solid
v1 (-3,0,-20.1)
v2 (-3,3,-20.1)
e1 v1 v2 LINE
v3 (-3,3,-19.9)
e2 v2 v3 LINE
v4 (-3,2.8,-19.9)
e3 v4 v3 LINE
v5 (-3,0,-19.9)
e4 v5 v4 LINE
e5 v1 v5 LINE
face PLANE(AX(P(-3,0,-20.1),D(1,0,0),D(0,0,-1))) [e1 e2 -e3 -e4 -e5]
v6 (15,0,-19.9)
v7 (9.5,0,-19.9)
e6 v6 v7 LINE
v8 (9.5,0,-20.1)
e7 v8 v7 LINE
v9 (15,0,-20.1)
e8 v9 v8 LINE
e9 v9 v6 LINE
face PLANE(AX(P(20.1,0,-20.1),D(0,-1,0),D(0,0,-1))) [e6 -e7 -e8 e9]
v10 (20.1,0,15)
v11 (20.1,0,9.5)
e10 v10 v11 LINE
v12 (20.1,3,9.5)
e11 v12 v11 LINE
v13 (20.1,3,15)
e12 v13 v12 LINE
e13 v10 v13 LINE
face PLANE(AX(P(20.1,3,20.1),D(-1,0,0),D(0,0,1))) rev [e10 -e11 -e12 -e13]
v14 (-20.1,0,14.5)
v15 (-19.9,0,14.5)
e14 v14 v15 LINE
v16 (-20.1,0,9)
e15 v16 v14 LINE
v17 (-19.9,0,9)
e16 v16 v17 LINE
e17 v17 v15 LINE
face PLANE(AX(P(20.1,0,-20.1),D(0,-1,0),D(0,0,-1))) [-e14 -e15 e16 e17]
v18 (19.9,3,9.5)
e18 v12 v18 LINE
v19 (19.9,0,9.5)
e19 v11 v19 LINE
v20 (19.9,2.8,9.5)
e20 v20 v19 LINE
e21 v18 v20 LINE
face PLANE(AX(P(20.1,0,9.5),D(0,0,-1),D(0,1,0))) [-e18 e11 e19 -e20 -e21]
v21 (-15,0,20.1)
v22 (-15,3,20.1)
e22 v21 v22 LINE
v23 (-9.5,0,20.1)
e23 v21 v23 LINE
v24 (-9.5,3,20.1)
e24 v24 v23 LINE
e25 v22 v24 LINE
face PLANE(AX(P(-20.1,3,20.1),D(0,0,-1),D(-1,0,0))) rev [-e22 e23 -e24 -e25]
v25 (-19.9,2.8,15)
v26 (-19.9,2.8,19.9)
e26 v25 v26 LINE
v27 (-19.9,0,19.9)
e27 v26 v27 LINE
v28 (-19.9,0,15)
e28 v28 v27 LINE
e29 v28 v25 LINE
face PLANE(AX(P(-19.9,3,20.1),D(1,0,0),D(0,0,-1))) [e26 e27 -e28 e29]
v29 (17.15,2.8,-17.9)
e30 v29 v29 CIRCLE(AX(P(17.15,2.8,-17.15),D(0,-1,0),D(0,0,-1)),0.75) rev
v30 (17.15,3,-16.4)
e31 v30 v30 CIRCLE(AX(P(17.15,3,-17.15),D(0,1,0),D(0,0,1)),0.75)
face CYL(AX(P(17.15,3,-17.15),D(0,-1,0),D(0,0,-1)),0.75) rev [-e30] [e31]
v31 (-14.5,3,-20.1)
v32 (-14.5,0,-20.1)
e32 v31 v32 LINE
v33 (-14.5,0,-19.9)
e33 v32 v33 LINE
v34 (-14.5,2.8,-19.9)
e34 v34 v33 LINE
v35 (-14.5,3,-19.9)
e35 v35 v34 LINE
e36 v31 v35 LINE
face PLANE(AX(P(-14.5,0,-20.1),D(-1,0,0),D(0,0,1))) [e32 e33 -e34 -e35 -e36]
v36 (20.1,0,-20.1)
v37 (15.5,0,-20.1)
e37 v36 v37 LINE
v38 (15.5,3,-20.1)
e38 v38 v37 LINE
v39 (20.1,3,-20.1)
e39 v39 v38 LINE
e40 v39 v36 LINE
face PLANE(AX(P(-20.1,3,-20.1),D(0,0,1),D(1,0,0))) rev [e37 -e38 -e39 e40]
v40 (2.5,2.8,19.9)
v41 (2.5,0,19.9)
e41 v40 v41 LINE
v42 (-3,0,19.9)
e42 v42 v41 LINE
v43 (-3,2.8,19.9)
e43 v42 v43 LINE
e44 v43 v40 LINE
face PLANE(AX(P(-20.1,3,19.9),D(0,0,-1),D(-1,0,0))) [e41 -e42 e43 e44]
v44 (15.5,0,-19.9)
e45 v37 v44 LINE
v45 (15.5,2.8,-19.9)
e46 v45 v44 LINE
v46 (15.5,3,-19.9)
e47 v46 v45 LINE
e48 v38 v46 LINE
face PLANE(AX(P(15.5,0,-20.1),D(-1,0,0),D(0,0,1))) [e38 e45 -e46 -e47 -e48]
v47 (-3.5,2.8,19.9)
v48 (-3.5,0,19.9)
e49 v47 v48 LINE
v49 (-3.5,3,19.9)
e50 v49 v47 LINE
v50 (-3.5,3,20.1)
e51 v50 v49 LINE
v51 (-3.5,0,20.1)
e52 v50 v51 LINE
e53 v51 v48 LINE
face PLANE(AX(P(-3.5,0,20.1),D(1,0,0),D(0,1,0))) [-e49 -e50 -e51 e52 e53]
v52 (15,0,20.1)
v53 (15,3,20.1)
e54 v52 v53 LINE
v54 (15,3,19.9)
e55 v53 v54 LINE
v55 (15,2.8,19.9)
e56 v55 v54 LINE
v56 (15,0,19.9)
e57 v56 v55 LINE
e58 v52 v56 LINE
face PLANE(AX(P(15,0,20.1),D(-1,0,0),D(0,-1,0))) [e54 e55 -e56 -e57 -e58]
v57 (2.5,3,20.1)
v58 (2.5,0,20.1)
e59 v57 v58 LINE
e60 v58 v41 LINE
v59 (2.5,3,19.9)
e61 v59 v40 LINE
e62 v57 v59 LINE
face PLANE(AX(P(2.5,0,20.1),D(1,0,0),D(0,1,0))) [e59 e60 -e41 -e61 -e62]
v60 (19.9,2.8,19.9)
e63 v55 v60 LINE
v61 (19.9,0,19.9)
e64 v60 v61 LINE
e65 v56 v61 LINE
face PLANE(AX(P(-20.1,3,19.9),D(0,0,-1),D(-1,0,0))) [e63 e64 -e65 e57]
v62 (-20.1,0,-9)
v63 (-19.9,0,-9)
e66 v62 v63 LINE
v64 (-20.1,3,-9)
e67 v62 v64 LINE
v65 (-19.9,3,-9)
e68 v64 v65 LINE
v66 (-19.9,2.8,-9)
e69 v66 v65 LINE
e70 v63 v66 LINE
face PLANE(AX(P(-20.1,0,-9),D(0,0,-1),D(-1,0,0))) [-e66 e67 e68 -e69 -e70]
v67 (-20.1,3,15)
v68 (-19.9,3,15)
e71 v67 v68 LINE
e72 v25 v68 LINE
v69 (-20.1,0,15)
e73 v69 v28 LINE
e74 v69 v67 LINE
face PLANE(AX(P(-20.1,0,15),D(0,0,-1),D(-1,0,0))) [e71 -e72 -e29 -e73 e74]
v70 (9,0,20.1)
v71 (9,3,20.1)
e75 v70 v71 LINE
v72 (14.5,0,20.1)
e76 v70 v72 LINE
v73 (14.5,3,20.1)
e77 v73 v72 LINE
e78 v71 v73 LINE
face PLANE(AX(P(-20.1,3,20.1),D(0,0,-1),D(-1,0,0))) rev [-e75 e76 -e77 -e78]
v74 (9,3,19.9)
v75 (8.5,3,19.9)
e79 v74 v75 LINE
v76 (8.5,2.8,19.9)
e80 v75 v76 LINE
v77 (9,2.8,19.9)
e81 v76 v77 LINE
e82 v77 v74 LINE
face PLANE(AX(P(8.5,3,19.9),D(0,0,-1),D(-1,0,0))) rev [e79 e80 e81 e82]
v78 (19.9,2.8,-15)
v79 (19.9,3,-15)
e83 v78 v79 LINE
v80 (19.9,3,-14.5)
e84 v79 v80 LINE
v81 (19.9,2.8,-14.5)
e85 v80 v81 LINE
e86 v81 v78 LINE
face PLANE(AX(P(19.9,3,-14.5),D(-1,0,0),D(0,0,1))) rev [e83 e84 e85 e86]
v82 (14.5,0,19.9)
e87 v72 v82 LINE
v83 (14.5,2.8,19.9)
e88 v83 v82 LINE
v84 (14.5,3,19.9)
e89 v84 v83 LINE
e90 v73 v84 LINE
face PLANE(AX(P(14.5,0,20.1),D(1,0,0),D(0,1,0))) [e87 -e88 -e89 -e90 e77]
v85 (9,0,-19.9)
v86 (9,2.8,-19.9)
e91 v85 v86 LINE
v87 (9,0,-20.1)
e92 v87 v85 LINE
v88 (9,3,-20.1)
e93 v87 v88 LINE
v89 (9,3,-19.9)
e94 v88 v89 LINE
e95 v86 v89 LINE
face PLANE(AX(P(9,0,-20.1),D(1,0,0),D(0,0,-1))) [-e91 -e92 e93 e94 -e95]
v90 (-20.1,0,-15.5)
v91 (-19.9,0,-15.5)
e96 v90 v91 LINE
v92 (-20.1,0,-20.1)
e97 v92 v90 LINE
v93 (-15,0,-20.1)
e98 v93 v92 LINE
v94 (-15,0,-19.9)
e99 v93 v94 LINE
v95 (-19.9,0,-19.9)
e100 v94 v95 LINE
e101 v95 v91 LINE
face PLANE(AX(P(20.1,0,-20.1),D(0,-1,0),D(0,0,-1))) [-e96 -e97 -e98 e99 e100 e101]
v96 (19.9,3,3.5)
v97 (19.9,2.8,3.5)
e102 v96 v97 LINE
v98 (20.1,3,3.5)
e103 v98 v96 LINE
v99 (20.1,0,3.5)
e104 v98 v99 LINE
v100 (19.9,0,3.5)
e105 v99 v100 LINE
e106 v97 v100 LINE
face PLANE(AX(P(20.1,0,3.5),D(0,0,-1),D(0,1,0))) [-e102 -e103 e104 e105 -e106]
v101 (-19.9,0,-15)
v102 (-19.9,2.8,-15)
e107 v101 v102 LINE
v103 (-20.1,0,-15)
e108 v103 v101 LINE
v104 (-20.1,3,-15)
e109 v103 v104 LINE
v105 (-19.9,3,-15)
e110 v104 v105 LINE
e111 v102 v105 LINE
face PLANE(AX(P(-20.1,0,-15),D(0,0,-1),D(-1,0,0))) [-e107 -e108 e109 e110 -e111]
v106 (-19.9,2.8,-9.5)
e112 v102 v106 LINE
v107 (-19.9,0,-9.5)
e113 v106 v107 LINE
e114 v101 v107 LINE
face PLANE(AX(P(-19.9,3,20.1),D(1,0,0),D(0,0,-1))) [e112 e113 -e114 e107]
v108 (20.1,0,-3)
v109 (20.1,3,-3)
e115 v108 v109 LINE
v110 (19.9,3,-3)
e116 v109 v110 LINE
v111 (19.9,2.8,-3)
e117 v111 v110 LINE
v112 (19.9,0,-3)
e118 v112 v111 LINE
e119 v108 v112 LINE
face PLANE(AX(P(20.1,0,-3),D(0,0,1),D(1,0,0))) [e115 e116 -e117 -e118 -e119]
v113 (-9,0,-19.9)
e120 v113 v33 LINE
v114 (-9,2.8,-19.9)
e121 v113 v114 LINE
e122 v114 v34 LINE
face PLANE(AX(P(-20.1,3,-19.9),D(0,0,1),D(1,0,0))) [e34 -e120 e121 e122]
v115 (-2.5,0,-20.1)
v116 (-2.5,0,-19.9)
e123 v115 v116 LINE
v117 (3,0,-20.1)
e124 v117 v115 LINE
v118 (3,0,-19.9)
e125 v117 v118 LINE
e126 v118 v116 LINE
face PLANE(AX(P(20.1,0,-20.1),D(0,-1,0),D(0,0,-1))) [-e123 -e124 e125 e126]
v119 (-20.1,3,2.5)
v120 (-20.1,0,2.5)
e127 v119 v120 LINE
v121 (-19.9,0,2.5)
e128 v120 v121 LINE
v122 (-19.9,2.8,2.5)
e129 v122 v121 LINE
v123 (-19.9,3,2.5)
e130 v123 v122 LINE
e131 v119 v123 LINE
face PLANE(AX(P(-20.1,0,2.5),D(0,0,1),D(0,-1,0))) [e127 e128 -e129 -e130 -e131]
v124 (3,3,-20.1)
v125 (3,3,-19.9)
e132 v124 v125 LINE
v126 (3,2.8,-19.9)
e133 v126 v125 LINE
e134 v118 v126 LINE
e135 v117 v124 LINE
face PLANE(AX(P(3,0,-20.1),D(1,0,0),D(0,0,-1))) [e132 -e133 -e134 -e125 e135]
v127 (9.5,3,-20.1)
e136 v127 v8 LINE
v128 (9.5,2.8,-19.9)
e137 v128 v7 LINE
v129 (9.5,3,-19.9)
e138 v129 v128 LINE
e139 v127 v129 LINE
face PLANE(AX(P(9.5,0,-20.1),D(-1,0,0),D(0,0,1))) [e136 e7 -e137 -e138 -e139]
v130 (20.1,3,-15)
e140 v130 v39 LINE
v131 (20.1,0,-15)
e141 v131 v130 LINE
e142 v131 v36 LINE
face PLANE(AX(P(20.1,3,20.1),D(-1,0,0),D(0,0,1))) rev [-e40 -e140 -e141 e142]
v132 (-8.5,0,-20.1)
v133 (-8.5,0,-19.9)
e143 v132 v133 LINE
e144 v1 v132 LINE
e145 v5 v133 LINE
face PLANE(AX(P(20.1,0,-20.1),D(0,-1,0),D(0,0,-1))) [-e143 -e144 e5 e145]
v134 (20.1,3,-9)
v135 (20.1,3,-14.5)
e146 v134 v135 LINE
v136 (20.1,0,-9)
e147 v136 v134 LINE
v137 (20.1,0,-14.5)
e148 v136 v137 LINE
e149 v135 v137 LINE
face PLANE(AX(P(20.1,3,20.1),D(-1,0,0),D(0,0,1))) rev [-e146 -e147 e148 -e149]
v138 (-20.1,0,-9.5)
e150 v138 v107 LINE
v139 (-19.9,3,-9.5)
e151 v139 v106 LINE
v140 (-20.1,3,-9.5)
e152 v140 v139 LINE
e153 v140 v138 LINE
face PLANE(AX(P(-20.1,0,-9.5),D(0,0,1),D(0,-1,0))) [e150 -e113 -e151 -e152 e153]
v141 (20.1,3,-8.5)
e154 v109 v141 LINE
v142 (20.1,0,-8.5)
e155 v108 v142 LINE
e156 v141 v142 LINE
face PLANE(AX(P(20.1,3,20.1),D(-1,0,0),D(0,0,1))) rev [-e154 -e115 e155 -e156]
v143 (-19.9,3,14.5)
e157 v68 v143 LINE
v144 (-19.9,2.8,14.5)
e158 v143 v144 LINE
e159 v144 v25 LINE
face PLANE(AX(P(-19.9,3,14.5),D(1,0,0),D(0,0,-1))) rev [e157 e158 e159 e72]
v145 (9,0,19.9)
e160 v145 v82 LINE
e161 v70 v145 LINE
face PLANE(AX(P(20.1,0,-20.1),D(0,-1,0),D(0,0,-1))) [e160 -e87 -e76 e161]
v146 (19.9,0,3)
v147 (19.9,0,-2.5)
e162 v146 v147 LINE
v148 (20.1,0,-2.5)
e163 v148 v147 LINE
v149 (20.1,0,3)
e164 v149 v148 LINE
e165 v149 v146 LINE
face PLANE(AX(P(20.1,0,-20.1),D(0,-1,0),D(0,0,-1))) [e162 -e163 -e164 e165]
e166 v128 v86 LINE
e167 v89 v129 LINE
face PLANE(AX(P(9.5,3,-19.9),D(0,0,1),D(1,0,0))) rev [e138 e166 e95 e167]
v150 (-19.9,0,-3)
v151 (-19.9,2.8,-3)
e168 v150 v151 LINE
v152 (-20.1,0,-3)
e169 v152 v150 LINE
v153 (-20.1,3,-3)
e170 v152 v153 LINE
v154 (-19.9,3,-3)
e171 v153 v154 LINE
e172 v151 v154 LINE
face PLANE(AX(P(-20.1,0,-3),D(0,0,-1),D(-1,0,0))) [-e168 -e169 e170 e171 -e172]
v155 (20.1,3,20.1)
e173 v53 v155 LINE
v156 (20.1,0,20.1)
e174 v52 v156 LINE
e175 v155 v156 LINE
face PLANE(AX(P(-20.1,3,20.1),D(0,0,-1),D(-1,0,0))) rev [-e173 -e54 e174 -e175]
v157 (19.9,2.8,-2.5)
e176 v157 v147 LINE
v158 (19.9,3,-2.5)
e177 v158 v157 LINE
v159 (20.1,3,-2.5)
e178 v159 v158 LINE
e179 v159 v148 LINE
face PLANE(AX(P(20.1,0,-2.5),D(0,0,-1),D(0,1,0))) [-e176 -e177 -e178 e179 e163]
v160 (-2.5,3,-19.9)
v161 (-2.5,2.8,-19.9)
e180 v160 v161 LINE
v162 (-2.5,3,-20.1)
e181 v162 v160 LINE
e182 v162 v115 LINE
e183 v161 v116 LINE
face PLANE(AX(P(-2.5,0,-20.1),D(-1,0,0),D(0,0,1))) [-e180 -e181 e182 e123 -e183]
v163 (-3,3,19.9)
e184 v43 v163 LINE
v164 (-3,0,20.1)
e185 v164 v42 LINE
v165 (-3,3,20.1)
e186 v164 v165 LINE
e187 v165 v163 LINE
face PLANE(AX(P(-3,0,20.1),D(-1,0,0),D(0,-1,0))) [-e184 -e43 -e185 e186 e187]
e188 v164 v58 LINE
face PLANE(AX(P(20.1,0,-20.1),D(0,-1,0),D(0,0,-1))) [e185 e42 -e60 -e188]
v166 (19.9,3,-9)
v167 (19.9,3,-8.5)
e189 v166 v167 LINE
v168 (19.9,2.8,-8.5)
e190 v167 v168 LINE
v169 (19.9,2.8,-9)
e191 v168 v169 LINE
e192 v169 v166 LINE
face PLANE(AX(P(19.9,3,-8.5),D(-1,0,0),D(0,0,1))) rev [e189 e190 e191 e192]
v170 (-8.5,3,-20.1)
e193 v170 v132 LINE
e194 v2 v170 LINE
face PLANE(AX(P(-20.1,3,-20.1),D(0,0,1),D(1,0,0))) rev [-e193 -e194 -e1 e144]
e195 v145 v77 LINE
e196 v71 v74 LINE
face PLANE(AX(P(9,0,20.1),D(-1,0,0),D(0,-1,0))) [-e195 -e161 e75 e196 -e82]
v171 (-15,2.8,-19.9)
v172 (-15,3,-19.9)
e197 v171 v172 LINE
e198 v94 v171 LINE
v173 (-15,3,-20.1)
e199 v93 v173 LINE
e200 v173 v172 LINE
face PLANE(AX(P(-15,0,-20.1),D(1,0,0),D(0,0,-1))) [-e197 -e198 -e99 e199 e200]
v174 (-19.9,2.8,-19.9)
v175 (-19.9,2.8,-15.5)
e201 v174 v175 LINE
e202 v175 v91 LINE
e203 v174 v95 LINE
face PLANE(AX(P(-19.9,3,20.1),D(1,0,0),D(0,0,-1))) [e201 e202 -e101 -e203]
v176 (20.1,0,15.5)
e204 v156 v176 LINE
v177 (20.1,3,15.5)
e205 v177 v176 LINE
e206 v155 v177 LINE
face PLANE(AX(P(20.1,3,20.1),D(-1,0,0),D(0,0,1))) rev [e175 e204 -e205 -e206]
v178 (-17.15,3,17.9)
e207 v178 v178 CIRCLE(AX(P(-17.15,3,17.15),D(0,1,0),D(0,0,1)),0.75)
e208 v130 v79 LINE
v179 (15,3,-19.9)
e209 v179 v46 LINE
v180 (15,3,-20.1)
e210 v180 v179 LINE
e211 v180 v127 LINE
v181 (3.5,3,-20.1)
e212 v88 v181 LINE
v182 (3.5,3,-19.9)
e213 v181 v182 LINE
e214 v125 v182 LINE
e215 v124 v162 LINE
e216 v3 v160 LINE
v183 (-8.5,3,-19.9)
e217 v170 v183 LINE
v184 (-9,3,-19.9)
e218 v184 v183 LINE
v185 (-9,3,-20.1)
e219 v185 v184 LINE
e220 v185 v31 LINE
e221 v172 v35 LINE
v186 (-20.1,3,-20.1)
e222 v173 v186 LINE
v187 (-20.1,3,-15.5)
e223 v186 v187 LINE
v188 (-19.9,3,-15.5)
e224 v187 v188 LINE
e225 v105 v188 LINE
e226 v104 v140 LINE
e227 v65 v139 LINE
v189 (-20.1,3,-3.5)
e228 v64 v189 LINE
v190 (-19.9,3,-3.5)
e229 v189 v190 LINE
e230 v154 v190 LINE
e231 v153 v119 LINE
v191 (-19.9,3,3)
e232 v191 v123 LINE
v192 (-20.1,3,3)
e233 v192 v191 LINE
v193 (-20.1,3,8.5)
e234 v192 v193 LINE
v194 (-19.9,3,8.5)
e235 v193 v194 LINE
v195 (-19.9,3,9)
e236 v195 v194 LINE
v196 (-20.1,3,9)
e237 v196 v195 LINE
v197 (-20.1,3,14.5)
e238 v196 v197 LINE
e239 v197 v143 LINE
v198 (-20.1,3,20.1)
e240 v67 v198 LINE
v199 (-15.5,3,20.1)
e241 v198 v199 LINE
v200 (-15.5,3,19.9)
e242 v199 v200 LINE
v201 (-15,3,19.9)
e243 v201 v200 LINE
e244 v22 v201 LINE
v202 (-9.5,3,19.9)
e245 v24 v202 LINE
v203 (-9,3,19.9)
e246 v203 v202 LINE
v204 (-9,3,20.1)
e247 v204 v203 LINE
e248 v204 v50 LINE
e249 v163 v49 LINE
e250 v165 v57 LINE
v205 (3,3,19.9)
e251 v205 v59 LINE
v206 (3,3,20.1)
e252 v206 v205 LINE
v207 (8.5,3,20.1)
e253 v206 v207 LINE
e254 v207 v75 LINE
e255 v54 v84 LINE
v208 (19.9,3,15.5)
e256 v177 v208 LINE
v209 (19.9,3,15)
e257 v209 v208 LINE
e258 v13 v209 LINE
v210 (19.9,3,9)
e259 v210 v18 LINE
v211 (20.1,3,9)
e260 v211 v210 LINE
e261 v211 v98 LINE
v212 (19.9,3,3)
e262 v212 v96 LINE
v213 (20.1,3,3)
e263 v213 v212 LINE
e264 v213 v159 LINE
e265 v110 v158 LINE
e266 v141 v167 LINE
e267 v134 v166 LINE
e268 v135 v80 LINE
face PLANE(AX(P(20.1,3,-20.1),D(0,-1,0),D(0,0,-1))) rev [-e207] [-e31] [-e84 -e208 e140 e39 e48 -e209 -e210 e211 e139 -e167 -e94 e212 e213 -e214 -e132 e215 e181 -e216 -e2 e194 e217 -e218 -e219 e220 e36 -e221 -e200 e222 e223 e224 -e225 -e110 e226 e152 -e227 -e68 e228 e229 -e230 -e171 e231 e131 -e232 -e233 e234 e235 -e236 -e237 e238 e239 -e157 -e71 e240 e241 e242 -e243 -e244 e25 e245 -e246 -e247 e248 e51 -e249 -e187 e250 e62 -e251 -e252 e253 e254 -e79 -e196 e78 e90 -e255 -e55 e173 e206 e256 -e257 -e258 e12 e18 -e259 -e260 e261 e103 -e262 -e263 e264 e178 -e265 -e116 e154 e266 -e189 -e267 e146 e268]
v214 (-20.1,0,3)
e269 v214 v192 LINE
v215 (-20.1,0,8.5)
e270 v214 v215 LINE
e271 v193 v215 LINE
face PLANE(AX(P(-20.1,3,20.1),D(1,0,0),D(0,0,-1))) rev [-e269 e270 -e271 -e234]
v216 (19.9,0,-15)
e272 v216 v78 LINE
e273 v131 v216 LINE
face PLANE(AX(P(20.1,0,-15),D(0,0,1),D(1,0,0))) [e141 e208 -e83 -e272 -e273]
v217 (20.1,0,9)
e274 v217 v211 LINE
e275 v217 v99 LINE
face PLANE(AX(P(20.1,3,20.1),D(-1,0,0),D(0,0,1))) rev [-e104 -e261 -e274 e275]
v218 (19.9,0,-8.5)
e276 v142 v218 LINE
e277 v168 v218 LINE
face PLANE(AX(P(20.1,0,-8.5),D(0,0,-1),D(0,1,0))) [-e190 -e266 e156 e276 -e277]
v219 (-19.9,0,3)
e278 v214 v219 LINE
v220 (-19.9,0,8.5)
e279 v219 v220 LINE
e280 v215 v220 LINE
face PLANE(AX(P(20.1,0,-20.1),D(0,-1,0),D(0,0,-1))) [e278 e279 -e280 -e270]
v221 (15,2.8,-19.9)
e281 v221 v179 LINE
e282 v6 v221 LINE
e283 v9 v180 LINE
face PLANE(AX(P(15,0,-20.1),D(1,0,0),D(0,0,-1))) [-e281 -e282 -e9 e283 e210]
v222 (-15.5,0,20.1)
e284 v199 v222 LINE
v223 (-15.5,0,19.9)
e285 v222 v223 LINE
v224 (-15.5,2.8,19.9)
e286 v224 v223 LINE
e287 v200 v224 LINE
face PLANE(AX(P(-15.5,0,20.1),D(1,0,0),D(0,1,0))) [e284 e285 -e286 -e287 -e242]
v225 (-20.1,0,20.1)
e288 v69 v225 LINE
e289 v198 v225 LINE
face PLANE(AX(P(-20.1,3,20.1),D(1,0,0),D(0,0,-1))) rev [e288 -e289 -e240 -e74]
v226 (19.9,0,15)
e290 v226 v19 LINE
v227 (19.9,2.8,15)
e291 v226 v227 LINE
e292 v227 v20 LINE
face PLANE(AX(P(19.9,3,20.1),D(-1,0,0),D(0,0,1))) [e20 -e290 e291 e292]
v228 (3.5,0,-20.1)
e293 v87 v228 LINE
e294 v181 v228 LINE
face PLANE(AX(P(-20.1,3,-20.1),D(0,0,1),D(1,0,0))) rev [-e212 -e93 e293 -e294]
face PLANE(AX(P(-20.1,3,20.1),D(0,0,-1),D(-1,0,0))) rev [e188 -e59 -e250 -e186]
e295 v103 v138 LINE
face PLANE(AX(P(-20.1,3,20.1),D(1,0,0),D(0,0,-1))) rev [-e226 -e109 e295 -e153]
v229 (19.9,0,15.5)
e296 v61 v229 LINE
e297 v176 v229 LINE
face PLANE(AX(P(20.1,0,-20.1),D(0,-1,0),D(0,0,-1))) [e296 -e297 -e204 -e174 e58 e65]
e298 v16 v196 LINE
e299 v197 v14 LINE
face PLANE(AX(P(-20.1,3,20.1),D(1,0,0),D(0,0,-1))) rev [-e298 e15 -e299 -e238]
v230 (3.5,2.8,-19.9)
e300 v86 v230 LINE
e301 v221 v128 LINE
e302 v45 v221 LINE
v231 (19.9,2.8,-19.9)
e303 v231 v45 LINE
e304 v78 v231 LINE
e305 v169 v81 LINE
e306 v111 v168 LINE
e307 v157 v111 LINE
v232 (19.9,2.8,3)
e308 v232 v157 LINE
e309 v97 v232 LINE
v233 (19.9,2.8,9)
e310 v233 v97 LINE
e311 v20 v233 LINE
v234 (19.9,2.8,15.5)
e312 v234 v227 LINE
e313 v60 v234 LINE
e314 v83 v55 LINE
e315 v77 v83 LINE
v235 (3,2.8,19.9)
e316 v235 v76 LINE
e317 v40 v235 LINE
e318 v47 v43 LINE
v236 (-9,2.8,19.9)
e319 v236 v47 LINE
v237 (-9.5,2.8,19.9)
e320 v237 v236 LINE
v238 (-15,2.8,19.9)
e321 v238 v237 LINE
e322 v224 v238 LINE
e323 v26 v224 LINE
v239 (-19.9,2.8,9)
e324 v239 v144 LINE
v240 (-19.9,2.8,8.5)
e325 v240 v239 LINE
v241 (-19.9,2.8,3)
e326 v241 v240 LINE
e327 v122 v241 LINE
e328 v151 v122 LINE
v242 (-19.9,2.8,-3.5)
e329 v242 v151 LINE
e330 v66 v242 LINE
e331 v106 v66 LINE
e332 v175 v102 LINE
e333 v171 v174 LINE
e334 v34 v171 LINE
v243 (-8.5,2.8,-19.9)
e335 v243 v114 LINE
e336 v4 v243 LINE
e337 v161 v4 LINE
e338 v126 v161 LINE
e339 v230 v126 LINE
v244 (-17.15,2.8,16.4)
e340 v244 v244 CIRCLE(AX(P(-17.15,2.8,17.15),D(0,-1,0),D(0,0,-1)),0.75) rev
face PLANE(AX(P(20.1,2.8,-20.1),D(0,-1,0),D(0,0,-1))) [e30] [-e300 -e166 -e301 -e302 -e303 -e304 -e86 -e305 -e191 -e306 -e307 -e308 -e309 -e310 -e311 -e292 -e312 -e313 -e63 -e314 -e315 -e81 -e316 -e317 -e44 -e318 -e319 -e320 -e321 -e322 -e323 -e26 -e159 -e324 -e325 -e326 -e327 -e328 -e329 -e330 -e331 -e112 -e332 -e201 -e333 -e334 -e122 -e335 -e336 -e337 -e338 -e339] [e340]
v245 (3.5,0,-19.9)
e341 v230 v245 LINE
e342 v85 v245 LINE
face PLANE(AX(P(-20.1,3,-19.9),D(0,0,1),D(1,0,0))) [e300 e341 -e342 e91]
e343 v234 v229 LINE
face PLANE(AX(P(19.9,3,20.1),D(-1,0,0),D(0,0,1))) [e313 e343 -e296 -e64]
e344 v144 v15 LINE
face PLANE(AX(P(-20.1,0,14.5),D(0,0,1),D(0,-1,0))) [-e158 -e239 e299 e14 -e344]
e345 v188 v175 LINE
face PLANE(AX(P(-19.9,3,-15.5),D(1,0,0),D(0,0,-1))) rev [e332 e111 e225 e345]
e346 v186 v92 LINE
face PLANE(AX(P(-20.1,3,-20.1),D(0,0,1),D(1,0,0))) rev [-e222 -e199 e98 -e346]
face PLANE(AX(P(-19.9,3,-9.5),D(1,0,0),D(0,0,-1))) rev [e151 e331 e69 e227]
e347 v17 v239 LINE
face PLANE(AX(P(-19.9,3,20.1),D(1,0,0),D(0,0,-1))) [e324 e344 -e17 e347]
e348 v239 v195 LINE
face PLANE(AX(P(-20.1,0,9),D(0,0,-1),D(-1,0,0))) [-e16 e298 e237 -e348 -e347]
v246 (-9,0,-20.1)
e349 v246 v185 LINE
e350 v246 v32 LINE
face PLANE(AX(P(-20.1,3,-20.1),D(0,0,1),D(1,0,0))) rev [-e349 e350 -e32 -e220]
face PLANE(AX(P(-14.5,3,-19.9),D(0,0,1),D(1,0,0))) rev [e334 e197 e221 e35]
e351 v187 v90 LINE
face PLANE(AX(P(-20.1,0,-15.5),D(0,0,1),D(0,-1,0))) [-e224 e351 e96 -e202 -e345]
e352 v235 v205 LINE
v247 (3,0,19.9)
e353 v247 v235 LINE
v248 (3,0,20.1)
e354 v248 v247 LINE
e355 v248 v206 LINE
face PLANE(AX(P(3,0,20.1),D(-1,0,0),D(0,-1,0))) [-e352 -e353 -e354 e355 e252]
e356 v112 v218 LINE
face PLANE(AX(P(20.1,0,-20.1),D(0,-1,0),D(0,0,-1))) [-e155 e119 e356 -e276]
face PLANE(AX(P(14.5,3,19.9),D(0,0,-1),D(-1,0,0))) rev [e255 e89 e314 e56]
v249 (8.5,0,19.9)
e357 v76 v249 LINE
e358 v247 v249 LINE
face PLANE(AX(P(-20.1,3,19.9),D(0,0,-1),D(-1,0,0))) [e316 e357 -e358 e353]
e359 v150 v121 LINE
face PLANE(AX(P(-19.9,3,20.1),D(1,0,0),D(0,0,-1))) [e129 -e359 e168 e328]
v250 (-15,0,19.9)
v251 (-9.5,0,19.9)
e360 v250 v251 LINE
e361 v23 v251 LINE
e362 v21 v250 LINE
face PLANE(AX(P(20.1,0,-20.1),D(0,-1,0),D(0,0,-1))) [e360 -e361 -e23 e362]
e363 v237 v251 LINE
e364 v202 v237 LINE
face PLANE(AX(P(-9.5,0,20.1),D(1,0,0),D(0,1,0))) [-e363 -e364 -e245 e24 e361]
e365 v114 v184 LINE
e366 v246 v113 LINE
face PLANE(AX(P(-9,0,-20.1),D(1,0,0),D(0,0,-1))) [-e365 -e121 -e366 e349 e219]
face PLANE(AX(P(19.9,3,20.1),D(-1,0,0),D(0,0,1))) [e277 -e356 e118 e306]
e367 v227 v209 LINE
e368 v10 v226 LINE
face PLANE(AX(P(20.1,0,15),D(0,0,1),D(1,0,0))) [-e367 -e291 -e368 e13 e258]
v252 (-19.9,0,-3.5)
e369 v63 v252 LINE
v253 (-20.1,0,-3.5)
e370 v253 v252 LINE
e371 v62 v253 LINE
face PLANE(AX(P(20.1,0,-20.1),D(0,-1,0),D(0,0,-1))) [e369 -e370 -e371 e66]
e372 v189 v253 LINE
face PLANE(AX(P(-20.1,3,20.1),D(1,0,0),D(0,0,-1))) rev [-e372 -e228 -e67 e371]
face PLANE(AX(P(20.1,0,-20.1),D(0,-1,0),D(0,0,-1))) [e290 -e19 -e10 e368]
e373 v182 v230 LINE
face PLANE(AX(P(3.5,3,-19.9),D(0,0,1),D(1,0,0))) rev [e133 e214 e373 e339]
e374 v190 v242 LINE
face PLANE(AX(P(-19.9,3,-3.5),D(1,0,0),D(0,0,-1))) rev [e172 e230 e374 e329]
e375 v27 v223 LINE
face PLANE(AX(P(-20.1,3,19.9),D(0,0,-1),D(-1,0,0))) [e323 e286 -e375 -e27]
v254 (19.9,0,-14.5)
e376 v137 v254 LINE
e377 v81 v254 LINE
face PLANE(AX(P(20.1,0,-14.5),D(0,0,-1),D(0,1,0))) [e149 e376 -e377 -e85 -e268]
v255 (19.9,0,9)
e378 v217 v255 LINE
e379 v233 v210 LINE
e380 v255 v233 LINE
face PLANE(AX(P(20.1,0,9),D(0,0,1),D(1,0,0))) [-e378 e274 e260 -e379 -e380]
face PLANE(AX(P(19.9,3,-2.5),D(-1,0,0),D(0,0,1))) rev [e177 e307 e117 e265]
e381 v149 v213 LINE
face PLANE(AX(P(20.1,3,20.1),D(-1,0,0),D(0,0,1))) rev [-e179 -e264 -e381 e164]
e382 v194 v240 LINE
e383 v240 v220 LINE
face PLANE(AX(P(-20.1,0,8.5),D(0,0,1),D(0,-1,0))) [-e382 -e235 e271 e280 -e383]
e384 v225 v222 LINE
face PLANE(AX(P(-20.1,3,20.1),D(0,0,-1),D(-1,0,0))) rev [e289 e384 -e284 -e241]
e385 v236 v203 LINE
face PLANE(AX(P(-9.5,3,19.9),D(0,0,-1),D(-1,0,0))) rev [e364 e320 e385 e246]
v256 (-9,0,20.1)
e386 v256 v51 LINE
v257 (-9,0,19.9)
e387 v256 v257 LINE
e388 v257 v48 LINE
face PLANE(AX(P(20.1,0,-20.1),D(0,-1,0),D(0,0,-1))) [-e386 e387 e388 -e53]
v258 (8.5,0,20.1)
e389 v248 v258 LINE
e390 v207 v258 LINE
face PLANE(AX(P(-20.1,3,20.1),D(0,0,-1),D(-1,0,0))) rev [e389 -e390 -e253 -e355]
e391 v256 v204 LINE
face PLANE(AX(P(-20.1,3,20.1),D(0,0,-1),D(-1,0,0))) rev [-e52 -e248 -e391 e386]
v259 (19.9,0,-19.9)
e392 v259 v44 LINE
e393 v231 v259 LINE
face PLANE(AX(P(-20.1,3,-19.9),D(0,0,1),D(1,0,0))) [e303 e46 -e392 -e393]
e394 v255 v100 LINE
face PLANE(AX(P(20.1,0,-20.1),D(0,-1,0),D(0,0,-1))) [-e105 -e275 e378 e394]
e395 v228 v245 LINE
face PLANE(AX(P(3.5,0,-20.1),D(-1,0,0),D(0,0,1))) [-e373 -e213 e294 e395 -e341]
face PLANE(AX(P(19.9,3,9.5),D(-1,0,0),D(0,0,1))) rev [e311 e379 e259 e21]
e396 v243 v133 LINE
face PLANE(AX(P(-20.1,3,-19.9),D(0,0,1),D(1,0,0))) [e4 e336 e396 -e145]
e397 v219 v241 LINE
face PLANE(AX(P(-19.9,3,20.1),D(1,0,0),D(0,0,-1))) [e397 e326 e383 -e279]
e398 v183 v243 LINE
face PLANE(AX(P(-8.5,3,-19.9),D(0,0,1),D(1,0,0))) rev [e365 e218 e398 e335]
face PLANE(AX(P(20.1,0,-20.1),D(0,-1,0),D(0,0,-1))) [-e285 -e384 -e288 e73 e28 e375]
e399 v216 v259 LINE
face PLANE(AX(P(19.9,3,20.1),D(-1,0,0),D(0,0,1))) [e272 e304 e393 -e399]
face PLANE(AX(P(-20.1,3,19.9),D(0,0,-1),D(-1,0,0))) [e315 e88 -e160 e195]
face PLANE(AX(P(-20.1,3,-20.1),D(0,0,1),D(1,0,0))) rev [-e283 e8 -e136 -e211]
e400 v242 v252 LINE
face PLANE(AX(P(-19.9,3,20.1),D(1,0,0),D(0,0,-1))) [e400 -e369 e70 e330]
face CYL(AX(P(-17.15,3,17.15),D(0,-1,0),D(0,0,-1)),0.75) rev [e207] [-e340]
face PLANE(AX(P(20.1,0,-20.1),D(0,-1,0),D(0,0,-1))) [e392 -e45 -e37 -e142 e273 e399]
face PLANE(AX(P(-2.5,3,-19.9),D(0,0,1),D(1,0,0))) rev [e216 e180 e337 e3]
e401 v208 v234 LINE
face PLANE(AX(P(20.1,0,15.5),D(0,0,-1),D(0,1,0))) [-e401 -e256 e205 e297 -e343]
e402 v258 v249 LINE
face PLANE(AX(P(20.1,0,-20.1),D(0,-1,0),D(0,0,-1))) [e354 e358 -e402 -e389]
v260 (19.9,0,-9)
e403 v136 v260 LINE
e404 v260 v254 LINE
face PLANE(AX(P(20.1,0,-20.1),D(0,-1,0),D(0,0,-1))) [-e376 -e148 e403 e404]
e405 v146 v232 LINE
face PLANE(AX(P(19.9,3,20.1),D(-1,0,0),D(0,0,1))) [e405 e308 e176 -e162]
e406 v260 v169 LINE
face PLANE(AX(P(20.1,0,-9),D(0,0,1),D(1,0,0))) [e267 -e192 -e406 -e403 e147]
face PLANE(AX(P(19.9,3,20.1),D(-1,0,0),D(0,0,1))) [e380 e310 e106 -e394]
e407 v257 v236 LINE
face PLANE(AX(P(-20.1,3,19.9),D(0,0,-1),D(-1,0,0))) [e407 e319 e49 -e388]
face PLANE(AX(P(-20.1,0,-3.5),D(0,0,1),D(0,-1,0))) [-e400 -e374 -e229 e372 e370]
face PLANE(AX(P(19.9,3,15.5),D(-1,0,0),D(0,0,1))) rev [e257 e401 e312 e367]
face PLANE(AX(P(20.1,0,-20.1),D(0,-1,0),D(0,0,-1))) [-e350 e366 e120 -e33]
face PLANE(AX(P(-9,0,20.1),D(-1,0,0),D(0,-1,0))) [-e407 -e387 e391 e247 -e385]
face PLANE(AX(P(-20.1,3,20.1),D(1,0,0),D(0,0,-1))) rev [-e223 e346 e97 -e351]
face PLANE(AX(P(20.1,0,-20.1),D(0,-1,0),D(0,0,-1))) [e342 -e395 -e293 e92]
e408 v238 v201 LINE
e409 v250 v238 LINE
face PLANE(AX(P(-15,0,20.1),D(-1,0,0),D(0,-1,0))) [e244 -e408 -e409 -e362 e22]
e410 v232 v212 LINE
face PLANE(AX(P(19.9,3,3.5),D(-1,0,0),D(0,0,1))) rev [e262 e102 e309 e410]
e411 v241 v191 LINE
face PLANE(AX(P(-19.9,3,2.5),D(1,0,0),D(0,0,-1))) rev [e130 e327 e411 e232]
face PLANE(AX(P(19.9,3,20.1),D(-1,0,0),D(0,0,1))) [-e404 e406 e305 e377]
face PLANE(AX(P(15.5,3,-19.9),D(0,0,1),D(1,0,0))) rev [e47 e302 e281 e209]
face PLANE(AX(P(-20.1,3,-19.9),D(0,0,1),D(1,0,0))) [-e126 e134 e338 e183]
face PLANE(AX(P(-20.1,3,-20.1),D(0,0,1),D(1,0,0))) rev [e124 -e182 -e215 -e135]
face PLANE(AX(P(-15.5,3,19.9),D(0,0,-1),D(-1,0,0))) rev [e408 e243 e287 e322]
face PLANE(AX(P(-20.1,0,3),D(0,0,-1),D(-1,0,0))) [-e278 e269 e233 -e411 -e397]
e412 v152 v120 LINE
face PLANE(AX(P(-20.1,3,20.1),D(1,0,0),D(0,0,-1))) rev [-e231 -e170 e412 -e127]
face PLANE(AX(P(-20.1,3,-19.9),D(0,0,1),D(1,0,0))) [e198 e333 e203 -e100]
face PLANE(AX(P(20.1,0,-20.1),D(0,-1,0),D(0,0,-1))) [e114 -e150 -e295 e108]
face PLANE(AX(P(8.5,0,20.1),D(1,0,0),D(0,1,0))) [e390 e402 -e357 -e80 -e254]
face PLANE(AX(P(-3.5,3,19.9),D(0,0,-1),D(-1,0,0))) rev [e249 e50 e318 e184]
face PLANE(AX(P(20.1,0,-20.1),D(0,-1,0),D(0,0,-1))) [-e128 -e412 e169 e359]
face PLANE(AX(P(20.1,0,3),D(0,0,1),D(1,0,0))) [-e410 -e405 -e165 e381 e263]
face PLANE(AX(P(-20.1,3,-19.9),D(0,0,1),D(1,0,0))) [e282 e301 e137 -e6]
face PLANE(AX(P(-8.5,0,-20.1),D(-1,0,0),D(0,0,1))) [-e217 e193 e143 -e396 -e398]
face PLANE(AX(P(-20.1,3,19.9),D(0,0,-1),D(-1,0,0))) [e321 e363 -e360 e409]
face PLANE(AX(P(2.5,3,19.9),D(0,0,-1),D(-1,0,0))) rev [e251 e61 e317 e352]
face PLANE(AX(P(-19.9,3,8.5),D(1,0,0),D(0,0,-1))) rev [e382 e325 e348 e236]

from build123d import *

# Parameters (mm, degrees)
SKETCH1_W               = 40.2
SKETCH1_H               = 40.2
BOSS_EXTRUDE1_DEPTH     = 3
SHELL1_T                = -0.2
SKETCH2_R               = 0.75
HOLES_DEPTH             = 29.583561709
FINGER_START            = 19.9
SKETCH3_W               = 0.5
SKETCH3_H               = 3
FINGER_SLOT_DEPTH       = 0.2
LPATTERN3_COUNT         = 6
LPATTERN3_PITCH         = 6
CIRPATTERN1_START       = -20.1
CIRPATTERN1_OUTLINE_W   = 0.5
CIRPATTERN1_OUTLINE_H   = 3
CIRPATTERN1_DEPTH       = 0.2
CIRPATTERN1_START_2     = 19.9
CIRPATTERN1_2_OUTLINE_W = 0.5
CIRPATTERN1_2_OUTLINE_H = 3
CIRPATTERN1_2_DEPTH     = 0.2
CIRPATTERN1_START_3     = -15.5
CIRPATTERN1_3_OUTLINE_W = 0.2
CIRPATTERN1_3_OUTLINE_H = 3
CIRPATTERN1_3_DEPTH     = 0.5
CIRPATTERN1_START_4     = -9.5
CIRPATTERN1_4_OUTLINE_W = 0.2
CIRPATTERN1_4_OUTLINE_H = 3
CIRPATTERN1_4_DEPTH     = 0.5
CIRPATTERN1_START_5     = -3.5
CIRPATTERN1_5_OUTLINE_W = 0.2
CIRPATTERN1_5_OUTLINE_H = 3
CIRPATTERN1_5_DEPTH     = 0.5
CIRPATTERN1_START_6     = 2.5
CIRPATTERN1_6_OUTLINE_W = 0.2
CIRPATTERN1_6_OUTLINE_H = 3
CIRPATTERN1_6_DEPTH     = 0.5
CIRPATTERN1_START_7     = 8.5
CIRPATTERN1_7_OUTLINE_W = 0.2
CIRPATTERN1_7_OUTLINE_H = 3
CIRPATTERN1_7_DEPTH     = 0.5
CIRPATTERN1_START_8     = 14.5
CIRPATTERN1_8_OUTLINE_W = 0.2
CIRPATTERN1_8_OUTLINE_H = 3
CIRPATTERN1_8_DEPTH     = 0.5


# Read off the part's stored shape, not the designer's step: CirPattern1
with BuildPart() as part:
    # Sketch1 → Boss-Extrude1 (new body)
    with BuildSketch(Plane(origin=(0, 0, 0), x_dir=(1, 0, 0), z_dir=(0, 1, 0))):
        Rectangle(SKETCH1_W, SKETCH1_H)
    extrude(amount=BOSS_EXTRUDE1_DEPTH)

    # Shell1
    shell1_openings = [part.faces().sort_by_distance(p)[0] for p in [
        (0, 0, 0),
    ]]
    offset(amount=SHELL1_T, openings=shell1_openings, kind=Kind.INTERSECTION)

    # Sketch2 → Holes (cut, through all)
    with BuildSketch(Plane(origin=(0, 0, 0), x_dir=(1, 0, 0), z_dir=(0, 1, 0))):
        with Locations(Location((-17.15, -17.15, 0), (0, 0, 90))):
            Circle(SKETCH2_R)
        with Locations(Location((17.15, 17.15, 0), (0, 0, 90))):
            Circle(SKETCH2_R)
    extrude(amount=HOLES_DEPTH, mode=Mode.SUBTRACT)

    # Sketch3 → Finger Slot (cut)
    with BuildSketch(Plane(origin=(0, 0, 0), x_dir=(0, 0, -1), z_dir=(1, 0, 0)).offset(FINGER_START)):
        with Locations((14.75, 1.5)):
            Rectangle(SKETCH3_W, SKETCH3_H)
    finger_slot = extrude(amount=FINGER_SLOT_DEPTH, mode=Mode.SUBTRACT)

    # LPattern3: Finger Slot ×6
    with Locations(*[(0, 0, i * LPATTERN3_PITCH) for i in range(1, LPATTERN3_COUNT)]):
        add(finger_slot, mode=Mode.SUBTRACT)

    # CirPattern1 outline → CirPattern1 (cut)
    with BuildSketch(Plane.XY.offset(CIRPATTERN1_START)):
        with Locations((9.25, 1.5)):
            Rectangle(CIRPATTERN1_OUTLINE_W, CIRPATTERN1_OUTLINE_H)
        with Locations((15.25, 1.5)):
            Rectangle(CIRPATTERN1_OUTLINE_W, CIRPATTERN1_OUTLINE_H)
        with Locations((3.25, 1.5)):
            Rectangle(CIRPATTERN1_OUTLINE_W, CIRPATTERN1_OUTLINE_H)
        with Locations((-2.75, 1.5)):
            Rectangle(CIRPATTERN1_OUTLINE_W, CIRPATTERN1_OUTLINE_H)
        with Locations((-8.75, 1.5)):
            Rectangle(CIRPATTERN1_OUTLINE_W, CIRPATTERN1_OUTLINE_H)
        with Locations((-14.75, 1.5)):
            Rectangle(CIRPATTERN1_OUTLINE_W, CIRPATTERN1_OUTLINE_H)
    extrude(amount=CIRPATTERN1_DEPTH, mode=Mode.SUBTRACT)

    # CirPattern1 2 outline → CirPattern1 2 (cut)
    with BuildSketch(Plane.XY.offset(CIRPATTERN1_START_2)):
        with Locations((14.75, 1.5)):
            Rectangle(CIRPATTERN1_2_OUTLINE_W, CIRPATTERN1_2_OUTLINE_H)
        with Locations((8.75, 1.5)):
            Rectangle(CIRPATTERN1_2_OUTLINE_W, CIRPATTERN1_2_OUTLINE_H)
        with Locations((2.75, 1.5)):
            Rectangle(CIRPATTERN1_2_OUTLINE_W, CIRPATTERN1_2_OUTLINE_H)
        with Locations((-3.25, 1.5)):
            Rectangle(CIRPATTERN1_2_OUTLINE_W, CIRPATTERN1_2_OUTLINE_H)
        with Locations((-9.25, 1.5)):
            Rectangle(CIRPATTERN1_2_OUTLINE_W, CIRPATTERN1_2_OUTLINE_H)
        with Locations((-15.25, 1.5)):
            Rectangle(CIRPATTERN1_2_OUTLINE_W, CIRPATTERN1_2_OUTLINE_H)
    extrude(amount=CIRPATTERN1_2_DEPTH, mode=Mode.SUBTRACT)

    # CirPattern1 3 outline → CirPattern1 3 (cut)
    with BuildSketch(Plane.XY.offset(CIRPATTERN1_START_3)):
        with Locations((-20, 1.5)):
            Rectangle(CIRPATTERN1_3_OUTLINE_W, CIRPATTERN1_3_OUTLINE_H)
    extrude(amount=CIRPATTERN1_3_DEPTH, mode=Mode.SUBTRACT)

    # CirPattern1 4 outline → CirPattern1 4 (cut)
    with BuildSketch(Plane.XY.offset(CIRPATTERN1_START_4)):
        with Locations((-20, 1.5)):
            Rectangle(CIRPATTERN1_4_OUTLINE_W, CIRPATTERN1_4_OUTLINE_H)
    extrude(amount=CIRPATTERN1_4_DEPTH, mode=Mode.SUBTRACT)

    # CirPattern1 5 outline → CirPattern1 5 (cut)
    with BuildSketch(Plane.XY.offset(CIRPATTERN1_START_5)):
        with Locations((-20, 1.5)):
            Rectangle(CIRPATTERN1_5_OUTLINE_W, CIRPATTERN1_5_OUTLINE_H)
    extrude(amount=CIRPATTERN1_5_DEPTH, mode=Mode.SUBTRACT)

    # CirPattern1 6 outline → CirPattern1 6 (cut)
    with BuildSketch(Plane.XY.offset(CIRPATTERN1_START_6)):
        with Locations((-20, 1.5)):
            Rectangle(CIRPATTERN1_6_OUTLINE_W, CIRPATTERN1_6_OUTLINE_H)
    extrude(amount=CIRPATTERN1_6_DEPTH, mode=Mode.SUBTRACT)

    # CirPattern1 7 outline → CirPattern1 7 (cut)
    with BuildSketch(Plane.XY.offset(CIRPATTERN1_START_7)):
        with Locations((-20, 1.5)):
            Rectangle(CIRPATTERN1_7_OUTLINE_W, CIRPATTERN1_7_OUTLINE_H)
    extrude(amount=CIRPATTERN1_7_DEPTH, mode=Mode.SUBTRACT)

    # CirPattern1 8 outline → CirPattern1 8 (cut)
    with BuildSketch(Plane.XY.offset(CIRPATTERN1_START_8)):
        with Locations((-20, 1.5)):
            Rectangle(CIRPATTERN1_8_OUTLINE_W, CIRPATTERN1_8_OUTLINE_H)
    extrude(amount=CIRPATTERN1_8_DEPTH, mode=Mode.SUBTRACT)


solid = part.part
